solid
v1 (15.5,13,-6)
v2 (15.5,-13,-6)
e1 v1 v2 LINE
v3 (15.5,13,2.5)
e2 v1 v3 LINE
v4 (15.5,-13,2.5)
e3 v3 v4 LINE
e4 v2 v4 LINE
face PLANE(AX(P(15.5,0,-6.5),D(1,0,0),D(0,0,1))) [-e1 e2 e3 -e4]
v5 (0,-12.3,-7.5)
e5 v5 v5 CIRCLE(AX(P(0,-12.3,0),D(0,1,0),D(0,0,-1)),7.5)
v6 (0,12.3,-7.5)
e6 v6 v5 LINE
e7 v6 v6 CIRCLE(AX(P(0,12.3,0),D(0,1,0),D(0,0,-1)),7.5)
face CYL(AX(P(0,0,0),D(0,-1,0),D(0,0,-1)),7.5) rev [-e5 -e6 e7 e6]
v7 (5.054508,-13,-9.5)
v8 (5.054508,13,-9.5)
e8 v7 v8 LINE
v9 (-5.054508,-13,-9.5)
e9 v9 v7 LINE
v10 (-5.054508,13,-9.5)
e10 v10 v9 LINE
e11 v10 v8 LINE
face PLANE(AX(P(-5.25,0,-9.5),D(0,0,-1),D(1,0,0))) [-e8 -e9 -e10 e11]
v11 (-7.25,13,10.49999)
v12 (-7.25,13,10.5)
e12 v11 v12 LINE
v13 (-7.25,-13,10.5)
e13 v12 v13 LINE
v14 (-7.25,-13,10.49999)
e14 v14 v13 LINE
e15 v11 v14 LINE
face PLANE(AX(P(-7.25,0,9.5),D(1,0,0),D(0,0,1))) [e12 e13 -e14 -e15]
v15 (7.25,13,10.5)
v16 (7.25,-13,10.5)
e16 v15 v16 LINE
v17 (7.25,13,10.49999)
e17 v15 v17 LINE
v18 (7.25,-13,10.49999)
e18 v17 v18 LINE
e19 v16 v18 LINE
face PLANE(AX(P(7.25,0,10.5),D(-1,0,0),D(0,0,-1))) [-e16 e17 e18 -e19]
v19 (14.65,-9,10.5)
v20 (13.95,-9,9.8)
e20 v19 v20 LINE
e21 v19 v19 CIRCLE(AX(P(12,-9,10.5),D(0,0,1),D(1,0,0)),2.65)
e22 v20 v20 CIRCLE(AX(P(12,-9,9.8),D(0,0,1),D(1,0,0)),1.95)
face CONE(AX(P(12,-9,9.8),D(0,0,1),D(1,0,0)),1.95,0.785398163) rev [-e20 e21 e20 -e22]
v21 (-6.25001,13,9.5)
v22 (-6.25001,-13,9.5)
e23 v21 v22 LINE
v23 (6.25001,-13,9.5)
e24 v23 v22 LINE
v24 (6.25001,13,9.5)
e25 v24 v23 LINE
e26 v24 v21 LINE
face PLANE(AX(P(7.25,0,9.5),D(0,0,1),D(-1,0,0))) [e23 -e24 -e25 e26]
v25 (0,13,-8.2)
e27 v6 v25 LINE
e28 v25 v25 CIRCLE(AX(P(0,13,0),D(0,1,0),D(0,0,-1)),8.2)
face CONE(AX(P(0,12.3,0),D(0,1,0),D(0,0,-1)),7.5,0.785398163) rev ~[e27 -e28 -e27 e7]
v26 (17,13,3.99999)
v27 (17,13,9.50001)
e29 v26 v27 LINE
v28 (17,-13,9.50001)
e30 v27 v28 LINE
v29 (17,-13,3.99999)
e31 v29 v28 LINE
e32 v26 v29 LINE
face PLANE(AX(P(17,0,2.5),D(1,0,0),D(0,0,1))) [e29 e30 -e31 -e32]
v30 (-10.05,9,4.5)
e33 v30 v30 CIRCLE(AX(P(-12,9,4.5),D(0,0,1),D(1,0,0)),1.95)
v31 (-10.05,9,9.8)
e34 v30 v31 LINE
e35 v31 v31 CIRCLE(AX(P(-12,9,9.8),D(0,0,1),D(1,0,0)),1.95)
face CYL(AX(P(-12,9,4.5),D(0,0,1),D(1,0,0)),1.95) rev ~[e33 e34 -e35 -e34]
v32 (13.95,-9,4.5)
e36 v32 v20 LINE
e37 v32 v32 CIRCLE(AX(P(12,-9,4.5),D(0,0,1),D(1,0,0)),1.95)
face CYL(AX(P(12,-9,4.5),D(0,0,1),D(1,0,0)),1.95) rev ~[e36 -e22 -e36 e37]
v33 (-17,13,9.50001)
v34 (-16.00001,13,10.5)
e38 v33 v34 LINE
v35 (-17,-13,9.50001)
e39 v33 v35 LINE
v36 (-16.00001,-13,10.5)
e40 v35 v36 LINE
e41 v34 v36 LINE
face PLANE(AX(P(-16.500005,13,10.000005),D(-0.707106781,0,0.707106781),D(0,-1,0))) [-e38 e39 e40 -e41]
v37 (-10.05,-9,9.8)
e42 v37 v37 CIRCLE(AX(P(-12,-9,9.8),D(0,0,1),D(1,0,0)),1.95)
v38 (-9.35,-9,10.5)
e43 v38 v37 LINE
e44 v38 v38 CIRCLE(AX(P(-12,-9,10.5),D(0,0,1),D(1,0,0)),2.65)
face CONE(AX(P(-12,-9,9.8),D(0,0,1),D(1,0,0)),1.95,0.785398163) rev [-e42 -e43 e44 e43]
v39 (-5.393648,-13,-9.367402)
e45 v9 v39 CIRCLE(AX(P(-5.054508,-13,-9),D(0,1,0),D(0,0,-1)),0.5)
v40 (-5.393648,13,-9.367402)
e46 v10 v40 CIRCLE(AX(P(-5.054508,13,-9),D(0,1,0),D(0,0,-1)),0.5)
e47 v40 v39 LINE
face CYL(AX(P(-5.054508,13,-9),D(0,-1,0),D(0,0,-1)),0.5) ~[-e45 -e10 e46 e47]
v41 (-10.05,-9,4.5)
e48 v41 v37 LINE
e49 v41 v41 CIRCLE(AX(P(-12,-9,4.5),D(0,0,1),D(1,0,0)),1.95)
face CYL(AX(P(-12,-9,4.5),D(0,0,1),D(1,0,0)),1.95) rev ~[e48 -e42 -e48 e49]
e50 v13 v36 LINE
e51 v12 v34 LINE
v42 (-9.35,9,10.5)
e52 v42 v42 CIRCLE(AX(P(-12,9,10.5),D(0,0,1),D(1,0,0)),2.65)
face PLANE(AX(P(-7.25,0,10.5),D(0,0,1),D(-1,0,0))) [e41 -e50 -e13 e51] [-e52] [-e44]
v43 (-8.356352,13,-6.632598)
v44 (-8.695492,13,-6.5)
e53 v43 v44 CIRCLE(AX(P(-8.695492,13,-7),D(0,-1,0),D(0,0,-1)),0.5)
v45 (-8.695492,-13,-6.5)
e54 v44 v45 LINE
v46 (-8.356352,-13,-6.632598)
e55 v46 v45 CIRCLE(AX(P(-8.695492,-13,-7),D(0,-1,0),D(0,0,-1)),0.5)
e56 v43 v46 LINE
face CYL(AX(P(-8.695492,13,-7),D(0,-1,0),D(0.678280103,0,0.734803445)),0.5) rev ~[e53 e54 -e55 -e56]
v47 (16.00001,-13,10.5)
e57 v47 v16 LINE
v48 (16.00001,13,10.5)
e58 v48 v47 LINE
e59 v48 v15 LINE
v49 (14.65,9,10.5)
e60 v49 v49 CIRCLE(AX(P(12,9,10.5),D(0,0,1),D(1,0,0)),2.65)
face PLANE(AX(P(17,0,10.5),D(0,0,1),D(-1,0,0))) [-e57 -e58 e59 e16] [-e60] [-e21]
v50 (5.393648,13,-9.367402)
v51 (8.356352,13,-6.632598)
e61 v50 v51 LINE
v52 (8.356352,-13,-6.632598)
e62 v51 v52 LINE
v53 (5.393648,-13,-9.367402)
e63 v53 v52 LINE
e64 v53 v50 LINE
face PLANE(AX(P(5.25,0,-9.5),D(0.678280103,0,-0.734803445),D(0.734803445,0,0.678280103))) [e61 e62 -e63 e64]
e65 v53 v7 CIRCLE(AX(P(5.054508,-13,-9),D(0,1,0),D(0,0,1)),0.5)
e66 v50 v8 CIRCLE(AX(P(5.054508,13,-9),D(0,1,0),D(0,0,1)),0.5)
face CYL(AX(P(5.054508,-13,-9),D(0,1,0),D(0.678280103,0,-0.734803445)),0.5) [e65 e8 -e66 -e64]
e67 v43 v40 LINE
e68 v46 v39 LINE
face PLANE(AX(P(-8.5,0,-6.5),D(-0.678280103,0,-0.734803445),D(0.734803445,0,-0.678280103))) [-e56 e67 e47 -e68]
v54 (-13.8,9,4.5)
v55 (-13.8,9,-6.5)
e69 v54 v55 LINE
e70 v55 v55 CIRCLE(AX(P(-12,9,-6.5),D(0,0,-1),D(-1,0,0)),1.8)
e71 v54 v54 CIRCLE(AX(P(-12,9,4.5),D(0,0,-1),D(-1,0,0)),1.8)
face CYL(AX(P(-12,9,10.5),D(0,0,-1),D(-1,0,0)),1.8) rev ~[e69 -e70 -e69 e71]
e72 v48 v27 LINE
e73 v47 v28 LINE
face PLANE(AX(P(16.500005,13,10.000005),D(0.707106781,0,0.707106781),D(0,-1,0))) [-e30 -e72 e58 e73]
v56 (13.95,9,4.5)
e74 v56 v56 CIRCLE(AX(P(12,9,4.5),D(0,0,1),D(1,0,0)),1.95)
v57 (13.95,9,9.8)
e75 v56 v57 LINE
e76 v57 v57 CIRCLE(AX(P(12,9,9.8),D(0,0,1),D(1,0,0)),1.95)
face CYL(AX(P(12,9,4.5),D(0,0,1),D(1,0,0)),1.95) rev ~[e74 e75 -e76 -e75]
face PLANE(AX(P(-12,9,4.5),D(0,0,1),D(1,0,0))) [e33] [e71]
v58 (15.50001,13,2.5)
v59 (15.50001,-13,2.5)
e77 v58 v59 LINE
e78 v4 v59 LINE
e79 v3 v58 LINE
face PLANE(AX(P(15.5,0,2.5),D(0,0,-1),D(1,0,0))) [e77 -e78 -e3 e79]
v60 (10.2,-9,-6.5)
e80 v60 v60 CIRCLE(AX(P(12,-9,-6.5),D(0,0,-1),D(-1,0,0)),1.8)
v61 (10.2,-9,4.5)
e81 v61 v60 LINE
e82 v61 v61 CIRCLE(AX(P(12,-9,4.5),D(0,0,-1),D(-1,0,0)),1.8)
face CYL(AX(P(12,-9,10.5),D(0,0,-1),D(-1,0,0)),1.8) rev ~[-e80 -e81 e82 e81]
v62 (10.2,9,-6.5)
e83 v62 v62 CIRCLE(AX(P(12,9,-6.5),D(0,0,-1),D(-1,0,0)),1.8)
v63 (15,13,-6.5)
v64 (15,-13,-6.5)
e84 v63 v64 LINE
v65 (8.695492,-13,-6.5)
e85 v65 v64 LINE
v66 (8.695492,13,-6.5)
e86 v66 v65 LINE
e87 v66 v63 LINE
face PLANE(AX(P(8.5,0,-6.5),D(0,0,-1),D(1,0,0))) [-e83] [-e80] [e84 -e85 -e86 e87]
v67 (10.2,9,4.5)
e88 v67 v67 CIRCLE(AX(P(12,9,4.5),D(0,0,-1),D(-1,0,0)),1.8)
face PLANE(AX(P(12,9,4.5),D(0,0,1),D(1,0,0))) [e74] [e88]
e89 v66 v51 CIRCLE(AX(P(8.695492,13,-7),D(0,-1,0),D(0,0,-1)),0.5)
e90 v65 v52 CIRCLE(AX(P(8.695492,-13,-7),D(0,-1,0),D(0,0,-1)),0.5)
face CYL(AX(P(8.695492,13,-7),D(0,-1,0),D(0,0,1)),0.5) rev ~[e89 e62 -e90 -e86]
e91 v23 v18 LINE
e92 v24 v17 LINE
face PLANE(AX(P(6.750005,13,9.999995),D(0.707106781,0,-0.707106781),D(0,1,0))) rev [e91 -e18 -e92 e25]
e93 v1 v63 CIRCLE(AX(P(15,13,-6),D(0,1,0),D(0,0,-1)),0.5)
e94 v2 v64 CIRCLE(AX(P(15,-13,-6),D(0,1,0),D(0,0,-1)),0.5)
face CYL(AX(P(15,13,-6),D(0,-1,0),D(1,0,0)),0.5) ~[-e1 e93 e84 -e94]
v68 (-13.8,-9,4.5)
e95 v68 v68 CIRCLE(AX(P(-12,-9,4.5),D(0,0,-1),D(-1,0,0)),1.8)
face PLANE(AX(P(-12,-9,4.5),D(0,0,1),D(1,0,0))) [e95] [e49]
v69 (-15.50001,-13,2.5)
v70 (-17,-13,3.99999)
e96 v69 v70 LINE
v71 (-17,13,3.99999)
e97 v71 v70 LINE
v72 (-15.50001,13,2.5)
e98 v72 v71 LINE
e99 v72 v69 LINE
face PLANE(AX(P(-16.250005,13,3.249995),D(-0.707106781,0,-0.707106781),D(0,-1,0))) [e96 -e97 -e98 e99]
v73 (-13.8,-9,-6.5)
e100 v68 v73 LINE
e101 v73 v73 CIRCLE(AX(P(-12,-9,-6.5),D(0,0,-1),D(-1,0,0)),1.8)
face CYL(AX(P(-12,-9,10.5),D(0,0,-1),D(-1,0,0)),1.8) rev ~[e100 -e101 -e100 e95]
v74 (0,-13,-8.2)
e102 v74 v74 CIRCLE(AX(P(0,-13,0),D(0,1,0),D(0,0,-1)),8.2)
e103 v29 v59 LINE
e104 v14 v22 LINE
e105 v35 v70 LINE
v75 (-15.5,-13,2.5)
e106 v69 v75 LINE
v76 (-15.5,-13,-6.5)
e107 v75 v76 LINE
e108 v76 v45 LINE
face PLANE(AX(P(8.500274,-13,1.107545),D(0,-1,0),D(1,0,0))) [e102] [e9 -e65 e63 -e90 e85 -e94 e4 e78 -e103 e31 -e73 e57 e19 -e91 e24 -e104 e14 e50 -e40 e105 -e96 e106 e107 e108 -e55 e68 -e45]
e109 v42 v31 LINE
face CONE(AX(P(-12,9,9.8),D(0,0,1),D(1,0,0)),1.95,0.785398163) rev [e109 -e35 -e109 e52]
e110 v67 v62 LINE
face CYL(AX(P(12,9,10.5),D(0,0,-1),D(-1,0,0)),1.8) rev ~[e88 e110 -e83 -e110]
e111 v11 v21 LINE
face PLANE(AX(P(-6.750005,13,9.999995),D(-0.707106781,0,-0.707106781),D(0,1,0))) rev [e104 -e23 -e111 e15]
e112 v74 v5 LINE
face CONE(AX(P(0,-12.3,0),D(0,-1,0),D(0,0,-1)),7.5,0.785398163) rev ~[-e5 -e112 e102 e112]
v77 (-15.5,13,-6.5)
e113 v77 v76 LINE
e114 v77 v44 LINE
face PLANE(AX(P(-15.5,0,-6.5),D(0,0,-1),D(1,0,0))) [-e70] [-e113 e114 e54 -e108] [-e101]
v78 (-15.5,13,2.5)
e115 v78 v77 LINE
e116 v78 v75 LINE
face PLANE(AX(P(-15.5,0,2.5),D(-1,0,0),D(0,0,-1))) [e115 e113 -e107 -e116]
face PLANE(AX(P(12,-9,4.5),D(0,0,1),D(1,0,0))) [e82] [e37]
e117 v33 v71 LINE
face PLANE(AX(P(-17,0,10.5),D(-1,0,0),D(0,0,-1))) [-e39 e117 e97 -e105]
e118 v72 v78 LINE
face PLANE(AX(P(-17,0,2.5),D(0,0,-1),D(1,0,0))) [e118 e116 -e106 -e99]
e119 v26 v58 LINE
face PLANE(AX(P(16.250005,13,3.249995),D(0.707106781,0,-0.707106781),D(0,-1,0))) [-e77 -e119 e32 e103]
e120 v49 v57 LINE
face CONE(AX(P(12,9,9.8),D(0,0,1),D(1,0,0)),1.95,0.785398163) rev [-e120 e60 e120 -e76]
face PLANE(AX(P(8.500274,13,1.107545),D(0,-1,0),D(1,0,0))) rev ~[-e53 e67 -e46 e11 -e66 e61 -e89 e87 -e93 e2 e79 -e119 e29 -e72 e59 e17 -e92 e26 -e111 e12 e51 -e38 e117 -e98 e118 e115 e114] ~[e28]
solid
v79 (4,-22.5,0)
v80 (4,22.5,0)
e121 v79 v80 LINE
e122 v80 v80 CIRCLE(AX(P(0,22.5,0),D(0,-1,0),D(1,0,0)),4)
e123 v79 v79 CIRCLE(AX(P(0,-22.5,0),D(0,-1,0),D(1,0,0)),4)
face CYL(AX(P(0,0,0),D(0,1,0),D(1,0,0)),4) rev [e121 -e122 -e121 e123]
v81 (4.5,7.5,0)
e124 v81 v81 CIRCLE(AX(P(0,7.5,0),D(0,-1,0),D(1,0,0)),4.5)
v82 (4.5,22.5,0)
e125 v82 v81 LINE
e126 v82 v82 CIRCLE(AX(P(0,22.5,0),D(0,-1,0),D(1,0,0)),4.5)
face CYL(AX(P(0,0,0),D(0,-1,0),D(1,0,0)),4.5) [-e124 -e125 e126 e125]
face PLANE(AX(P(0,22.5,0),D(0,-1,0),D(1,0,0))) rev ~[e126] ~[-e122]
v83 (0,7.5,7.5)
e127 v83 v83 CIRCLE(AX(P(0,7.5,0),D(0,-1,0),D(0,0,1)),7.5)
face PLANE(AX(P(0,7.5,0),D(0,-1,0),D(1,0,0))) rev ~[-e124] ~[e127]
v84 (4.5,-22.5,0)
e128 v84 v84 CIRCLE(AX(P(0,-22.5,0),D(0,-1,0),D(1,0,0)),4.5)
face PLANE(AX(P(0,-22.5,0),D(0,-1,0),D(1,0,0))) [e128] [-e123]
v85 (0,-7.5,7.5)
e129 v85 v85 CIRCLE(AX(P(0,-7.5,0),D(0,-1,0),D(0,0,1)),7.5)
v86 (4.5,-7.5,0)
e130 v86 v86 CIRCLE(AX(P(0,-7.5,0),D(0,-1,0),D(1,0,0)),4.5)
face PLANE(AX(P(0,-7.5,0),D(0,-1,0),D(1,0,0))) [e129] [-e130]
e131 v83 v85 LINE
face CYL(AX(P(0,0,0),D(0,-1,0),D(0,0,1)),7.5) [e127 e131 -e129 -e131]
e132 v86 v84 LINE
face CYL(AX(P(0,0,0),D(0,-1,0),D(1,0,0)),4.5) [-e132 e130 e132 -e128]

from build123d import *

# Parameters (mm, degrees)
F1_DEPTH       = 13
F2_SIZE        = 0.99999
F3_SIZE        = 1.49999
F4_R           = 0.5
F6_D           = 3.6
F6_CBORE_D     = 3.9
F6_CBORE_DEPTH = 6
F7_SIZE        = 0.7
F0_R           = 4.5
F8_DEPTH       = 7.5
F0_R_2         = 4
F9_DEPTH       = 22.5


# Not quite as in the source:
# - a fillet or chamfer is up to 0.001 mm smaller than in the source, because OpenCascade refuses the exact size


with BuildPart() as f1:
    # F0 (on Front) → F1 (new body, symmetric)
    with BuildSketch(Plane.XZ):
        with BuildLine():
            ThreePointArc((0, 7.5), (5.3033008589, 5.3033008589), (7.5, 0))
            ThreePointArc((7.5, 0), (5.3033008589, -5.3033008589), (0, -7.5))
            Line((0, -7.5), (0, -9.5))
            Line((0, -9.5), (5.25, -9.5))
            Line((5.25, -9.5), (8.5, -6.5))
            Line((8.5, -6.5), (15.5, -6.5))
            Line((15.5, -6.5), (15.5, 2.5))
            Line((15.5, 2.5), (17, 2.5))
            Line((17, 2.5), (17, 10.5))
            Line((17, 10.5), (7.25, 10.5))
            Line((7.25, 10.5), (7.25, 9.5))
            Line((7.25, 9.5), (0, 9.5))
            Line((0, 9.5), (0, 7.5))
        make_face()
        with BuildLine():
            ThreePointArc((0, -7.5), (-7.5, 0), (0, 7.5))
            Line((0, 7.5), (0, 9.5))
            Line((0, 9.5), (-7.25, 9.5))
            Line((-7.25, 9.5), (-7.25, 10.5))
            Line((-7.25, 10.5), (-17, 10.5))
            Line((-17, 10.5), (-17, 2.5))
            Line((-17, 2.5), (-15.5, 2.5))
            Line((-15.5, 2.5), (-15.5, -6.5))
            Line((-15.5, -6.5), (-8.5, -6.5))
            Line((-8.5, -6.5), (-5.25, -9.5))
            Line((-5.25, -9.5), (0, -9.5))
            Line((0, -9.5), (0, -7.5))
        make_face()
    extrude(amount=F1_DEPTH, both=True)

    # F2 (size 1 in the source; OpenCascade refuses exactly that, so slightly less here)
    f2_edges = [f1.edges().sort_by_distance(p)[0] for p in [
        (7.25, 0, 9.5),
        (17, 0, 10.5),
        (-7.25, 0, 9.5),
        (-17, 0, 10.5),
    ]]
    chamfer(f2_edges, length=F2_SIZE)

    # F3 (size 1.5 in the source; OpenCascade refuses exactly that, so slightly less here)
    f3_edges = [f1.edges().sort_by_distance(p)[0] for p in [
        (17, 0, 2.5),
        (-17, 0, 2.5),
    ]]
    chamfer(f3_edges, length=F3_SIZE)

    # F4
    f4_edges = [f1.edges().sort_by_distance(p)[0] for p in [
        (15.5, 0, -6.5),
        (8.5, 0, -6.5),
        (5.25, 0, -9.5),
        (-5.25, 0, -9.5),
        (-8.5, 0, -6.5),
    ]]
    fillet(f4_edges, radius=F4_R)

    # F6 (through all)
    with Locations(Plane.XY.offset(10.5)):
        with Locations((12, 9), (12, -9), (-12, 9), (-12, -9)):
            CounterBoreHole(F6_D / 2, F6_CBORE_D / 2, F6_CBORE_DEPTH)

    # F7
    f7_edges = [f1.edges().sort_by_distance(p)[0] for p in [
        (-7.5, -13, 0),
        (-7.5, 13, 0),
        (10.05, 9, 10.5),
        (10.05, -9, 10.5),
        (-13.95, 9, 10.5),
        (-13.95, -9, 10.5),
    ]]
    chamfer(f7_edges, length=F7_SIZE)


with BuildPart() as f8:
    # F0 (on Front) → F8 (new body, symmetric)
    with BuildSketch(Plane.XZ):
        with BuildLine():
            ThreePointArc((0, -7.5), (5.3033008589, -5.3033008589), (7.5, 0))
            ThreePointArc((7.5, 0), (5.3033008589, 5.3033008589), (0, 7.5))
            ThreePointArc((0, 7.5), (-7.5, 0), (0, -7.5))
        make_face()
        Circle(F0_R, mode=Mode.SUBTRACT)
    extrude(amount=F8_DEPTH, both=True)

    # F0 (on Front) → F9 (join, symmetric)
    with BuildSketch(Plane.XZ):
        Circle(F0_R)
        Circle(F0_R_2, mode=Mode.SUBTRACT)
    extrude(amount=F9_DEPTH, both=True)


solid = Compound([f1.part, f8.part])
